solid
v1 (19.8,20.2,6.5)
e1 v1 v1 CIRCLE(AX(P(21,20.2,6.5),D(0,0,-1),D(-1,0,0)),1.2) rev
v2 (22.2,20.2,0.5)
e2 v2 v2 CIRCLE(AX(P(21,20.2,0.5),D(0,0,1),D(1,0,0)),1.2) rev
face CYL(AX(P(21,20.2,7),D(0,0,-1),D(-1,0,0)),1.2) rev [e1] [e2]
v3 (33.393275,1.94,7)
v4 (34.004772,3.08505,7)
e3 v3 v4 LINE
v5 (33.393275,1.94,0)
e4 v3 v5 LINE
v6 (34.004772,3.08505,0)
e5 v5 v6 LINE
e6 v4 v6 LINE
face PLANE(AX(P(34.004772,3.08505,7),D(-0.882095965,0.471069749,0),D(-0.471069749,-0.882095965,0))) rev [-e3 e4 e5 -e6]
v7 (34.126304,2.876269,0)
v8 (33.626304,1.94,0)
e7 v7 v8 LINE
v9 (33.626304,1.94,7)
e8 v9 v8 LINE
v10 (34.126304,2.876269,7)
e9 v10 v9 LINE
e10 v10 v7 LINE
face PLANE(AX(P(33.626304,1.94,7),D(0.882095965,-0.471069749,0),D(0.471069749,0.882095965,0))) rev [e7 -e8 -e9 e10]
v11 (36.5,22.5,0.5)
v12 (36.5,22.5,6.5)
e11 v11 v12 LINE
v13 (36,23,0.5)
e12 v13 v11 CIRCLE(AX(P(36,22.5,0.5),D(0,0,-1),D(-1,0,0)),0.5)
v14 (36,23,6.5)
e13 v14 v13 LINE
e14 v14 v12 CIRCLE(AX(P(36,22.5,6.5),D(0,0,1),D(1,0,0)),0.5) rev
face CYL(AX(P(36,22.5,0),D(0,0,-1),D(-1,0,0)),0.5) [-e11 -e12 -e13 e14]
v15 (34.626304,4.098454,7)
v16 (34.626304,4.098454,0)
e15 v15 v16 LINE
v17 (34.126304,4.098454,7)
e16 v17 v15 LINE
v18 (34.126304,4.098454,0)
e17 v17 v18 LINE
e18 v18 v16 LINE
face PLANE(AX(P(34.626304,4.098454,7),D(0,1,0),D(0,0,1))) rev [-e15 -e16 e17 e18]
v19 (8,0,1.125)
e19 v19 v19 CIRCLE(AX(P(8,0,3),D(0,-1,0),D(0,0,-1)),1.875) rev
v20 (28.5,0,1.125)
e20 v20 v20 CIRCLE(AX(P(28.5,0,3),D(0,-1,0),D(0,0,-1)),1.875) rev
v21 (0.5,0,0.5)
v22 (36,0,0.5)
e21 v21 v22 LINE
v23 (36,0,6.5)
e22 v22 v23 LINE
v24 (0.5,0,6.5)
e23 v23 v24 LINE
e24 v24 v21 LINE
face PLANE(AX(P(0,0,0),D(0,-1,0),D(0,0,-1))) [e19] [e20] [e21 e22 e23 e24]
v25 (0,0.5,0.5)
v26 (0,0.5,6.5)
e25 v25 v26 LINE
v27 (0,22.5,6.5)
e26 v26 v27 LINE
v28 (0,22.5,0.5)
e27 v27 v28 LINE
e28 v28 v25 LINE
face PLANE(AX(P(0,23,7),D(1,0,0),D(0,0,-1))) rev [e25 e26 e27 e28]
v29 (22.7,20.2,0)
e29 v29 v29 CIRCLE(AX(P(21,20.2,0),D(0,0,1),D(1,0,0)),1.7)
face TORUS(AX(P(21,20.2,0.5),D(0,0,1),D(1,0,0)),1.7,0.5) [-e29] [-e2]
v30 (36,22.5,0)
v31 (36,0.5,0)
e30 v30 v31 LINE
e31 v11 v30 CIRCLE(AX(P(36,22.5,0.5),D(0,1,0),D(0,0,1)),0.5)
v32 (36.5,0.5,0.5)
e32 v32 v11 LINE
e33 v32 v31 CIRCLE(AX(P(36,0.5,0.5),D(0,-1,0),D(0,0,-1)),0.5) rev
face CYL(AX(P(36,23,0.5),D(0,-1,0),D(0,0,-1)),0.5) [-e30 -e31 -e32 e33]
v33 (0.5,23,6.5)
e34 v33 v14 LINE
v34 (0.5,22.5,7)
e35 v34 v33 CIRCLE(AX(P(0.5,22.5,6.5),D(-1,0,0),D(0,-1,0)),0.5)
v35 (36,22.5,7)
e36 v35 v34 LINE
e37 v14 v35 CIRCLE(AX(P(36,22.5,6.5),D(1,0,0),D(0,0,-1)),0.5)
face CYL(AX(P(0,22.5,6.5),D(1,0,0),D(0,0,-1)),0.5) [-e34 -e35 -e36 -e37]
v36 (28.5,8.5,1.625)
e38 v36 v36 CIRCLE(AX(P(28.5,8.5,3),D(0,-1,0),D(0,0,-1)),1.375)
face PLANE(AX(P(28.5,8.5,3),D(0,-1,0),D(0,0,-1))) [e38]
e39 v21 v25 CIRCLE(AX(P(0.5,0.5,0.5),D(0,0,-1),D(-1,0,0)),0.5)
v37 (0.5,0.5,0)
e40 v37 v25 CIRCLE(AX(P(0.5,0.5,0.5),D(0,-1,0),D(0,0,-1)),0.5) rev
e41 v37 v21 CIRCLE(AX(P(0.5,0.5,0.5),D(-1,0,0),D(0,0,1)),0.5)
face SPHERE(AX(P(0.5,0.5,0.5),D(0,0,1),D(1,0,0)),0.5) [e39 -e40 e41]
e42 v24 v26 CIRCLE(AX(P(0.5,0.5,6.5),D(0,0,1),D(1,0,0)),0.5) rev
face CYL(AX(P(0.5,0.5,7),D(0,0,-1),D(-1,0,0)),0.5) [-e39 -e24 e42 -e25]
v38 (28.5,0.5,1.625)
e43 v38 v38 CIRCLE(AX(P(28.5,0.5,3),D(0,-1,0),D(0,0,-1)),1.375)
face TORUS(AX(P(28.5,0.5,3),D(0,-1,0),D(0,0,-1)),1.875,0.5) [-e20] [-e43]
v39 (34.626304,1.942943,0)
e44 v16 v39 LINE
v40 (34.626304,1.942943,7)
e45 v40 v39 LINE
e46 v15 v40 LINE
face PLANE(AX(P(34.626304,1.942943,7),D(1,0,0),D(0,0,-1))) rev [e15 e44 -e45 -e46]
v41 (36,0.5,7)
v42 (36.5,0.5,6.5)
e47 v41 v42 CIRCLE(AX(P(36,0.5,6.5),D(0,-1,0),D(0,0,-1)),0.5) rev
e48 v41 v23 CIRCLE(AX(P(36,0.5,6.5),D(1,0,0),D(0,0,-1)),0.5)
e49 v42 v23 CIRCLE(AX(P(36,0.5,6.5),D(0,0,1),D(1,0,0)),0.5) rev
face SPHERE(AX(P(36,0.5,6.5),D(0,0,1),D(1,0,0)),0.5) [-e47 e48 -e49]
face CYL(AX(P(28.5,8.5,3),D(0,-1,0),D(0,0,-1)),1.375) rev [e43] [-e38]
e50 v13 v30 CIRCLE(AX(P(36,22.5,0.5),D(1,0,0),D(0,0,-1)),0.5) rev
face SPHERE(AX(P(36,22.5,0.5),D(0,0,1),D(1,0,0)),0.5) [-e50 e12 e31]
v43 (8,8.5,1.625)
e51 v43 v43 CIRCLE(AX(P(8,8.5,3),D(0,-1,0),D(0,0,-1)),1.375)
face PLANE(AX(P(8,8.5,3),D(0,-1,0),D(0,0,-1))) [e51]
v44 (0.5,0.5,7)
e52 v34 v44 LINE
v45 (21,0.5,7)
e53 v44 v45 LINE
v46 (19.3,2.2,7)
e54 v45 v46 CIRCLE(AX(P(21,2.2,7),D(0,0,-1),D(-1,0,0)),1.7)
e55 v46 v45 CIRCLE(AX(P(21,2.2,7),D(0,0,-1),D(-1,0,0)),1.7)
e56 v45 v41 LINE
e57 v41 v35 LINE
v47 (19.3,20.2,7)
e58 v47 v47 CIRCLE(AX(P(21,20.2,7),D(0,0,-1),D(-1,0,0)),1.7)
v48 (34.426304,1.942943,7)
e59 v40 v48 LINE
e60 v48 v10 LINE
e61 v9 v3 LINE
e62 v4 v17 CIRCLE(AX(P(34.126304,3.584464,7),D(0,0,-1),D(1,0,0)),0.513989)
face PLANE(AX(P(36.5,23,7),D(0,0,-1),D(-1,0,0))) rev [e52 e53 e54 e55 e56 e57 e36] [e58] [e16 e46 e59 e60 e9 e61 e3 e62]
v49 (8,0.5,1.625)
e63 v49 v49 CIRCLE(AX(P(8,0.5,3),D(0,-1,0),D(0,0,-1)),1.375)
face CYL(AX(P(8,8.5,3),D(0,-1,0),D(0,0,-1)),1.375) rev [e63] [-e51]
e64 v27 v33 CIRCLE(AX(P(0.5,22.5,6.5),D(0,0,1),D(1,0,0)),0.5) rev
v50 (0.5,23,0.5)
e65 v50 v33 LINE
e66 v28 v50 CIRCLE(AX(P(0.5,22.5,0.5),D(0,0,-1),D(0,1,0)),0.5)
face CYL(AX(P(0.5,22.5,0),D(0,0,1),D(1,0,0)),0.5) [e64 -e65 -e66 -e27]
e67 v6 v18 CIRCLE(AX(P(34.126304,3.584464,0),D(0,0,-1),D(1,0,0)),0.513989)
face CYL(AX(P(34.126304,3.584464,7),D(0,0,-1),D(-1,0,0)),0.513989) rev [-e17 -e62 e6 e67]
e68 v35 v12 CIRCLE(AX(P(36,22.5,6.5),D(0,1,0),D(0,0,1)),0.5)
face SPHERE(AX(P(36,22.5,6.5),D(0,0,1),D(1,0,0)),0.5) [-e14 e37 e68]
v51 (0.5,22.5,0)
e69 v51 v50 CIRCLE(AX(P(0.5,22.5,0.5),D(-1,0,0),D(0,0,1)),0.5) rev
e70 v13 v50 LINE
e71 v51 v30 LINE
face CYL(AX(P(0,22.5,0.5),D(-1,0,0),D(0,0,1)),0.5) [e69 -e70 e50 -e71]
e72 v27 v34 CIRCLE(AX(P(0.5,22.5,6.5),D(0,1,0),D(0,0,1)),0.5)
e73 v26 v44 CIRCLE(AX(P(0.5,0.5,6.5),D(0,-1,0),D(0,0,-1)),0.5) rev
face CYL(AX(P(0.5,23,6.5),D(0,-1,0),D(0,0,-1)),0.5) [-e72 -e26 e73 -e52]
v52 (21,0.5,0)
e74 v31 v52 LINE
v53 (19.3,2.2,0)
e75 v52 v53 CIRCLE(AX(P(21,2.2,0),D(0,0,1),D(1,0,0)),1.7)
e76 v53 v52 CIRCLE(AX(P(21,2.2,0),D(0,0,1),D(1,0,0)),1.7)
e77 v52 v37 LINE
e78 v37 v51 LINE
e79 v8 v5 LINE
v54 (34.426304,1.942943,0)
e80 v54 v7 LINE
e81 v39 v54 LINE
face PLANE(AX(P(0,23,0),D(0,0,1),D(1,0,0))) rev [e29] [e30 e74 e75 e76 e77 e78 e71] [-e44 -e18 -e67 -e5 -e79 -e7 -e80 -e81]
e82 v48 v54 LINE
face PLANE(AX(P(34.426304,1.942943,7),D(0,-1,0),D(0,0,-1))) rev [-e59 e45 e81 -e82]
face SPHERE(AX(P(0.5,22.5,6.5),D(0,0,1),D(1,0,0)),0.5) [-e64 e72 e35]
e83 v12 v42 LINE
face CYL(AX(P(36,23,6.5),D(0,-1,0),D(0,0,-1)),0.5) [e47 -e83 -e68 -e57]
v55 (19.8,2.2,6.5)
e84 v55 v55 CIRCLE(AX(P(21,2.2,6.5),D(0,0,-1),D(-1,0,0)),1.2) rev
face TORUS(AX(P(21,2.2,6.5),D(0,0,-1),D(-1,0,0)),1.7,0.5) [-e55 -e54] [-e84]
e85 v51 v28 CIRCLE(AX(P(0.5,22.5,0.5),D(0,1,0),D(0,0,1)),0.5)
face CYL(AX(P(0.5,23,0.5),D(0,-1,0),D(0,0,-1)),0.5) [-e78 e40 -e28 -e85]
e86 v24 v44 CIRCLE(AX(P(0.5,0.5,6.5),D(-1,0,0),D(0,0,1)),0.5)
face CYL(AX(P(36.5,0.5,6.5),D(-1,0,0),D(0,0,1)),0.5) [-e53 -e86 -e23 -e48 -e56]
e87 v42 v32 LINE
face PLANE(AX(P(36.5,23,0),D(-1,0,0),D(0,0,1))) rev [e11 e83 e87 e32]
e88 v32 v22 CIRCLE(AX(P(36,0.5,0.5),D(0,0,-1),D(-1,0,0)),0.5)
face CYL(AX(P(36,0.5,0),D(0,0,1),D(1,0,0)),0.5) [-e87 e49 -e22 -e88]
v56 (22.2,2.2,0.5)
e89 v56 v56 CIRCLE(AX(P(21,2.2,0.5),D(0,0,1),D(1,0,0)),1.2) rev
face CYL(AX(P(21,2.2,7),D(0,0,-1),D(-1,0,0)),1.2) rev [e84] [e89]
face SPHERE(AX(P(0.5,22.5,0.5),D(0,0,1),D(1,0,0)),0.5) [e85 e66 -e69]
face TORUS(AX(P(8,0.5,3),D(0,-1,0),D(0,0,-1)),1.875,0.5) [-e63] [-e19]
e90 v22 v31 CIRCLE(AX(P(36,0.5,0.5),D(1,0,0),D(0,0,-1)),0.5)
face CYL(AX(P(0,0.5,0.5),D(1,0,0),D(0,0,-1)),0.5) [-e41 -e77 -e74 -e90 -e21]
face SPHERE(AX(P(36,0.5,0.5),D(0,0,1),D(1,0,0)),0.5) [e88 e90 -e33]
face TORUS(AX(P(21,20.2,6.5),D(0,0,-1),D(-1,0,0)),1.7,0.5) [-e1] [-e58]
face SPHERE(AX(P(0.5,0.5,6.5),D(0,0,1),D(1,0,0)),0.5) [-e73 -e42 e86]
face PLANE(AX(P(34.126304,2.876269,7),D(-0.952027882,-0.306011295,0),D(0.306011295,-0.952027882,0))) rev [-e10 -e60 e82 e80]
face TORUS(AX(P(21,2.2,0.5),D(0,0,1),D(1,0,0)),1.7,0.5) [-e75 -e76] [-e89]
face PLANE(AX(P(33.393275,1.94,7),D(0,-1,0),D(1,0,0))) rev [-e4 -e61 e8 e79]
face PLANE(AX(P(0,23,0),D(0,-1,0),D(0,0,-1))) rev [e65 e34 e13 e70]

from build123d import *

# Parameters (mm, degrees)
SKETCH1_W           = 36.5
SKETCH1_H           = 7
BOSS_EXTRUDE1_DEPTH = 23
SKETCH2_R           = 1.375
CUT_EXTRUDE1_DEPTH  = 8.5
SKETCH4_R           = 1.2
CUT_EXTRUDE2_DEPTH  = 7
FILLET1_R           = 0.5
CUT_EXTRUDE3_DEPTH  = 44.706406853


with BuildPart() as part:
    # Sketch1 → Boss-Extrude1 (new body)
    with BuildSketch(Plane(origin=(0, 0, 0), x_dir=(1, 0, 0), z_dir=(0, 1, 0))):
        with Locations((18.25, -3.5)):
            Rectangle(SKETCH1_W, SKETCH1_H)
    extrude(amount=BOSS_EXTRUDE1_DEPTH)

    # Sketch2 → Cut-Extrude1 (cut)
    with BuildSketch(Plane.XZ):
        with Locations(Location((8, 3, 0), (0, 0, 270))):
            Circle(SKETCH2_R)
        with Locations(Location((28.5, 3, 0), (0, 0, 270))):
            Circle(SKETCH2_R)
    extrude(amount=-CUT_EXTRUDE1_DEPTH, mode=Mode.SUBTRACT)

    # Sketch4 → Cut-Extrude2 (cut)
    with BuildSketch(Plane(origin=(0, 0, 0), x_dir=(-1, 0, 0), z_dir=(0, 0, -1))):
        with Locations((-21, 2.2)):
            Circle(SKETCH4_R)
        with Locations((-21, 20.2)):
            Circle(SKETCH4_R)
    extrude(amount=-CUT_EXTRUDE2_DEPTH, mode=Mode.SUBTRACT)

    # Fillet1
    fillet1_edges = [part.edges().sort_by_distance(p)[0] for p in [
        (36.5, 23, 3.5),
        (8, 0, 4.375),
        (18.25, 23, 0),
        (28.5, 0, 4.375),
        (22.2, 2.2, 7),
        (22.2, 2.2, 0),
        (22.2, 20.2, 7),
        (22.2, 20.2, 0),
        (0, 23, 3.5),
        (18.25, 0, 0),
        (36.5, 0, 3.5),
        (18.25, 0, 7),
        (0, 0, 3.5),
        (0, 11.5, 0),
        (36.5, 11.5, 0),
        (36.5, 11.5, 7),
        (0, 11.5, 7),
        (18.25, 23, 7),
    ]]
    fillet(fillet1_edges, radius=FILLET1_R - 0.0001)  # a hair under: the kernel refuses the full size

    # Sketch6 → Cut-Extrude3 (cut, through all)
    with BuildSketch(Plane(origin=(0, 0, 0), x_dir=(-1, 0, 0), z_dir=(0, 0, -1))):
        with BuildLine():
            Line((-34.626303685, 1.94294274), (-34.626303685, 4.098453698))
            Line((-34.626303685, 4.098453698), (-34.126303685, 4.098453698))
            ThreePointArc((-34.126303685, 4.098453698), (-33.615970927, 3.645665749), (-34.004771514, 3.085049521))
            Line((-34.004771514, 3.085049521), (-33.393275473, 1.94))
            Line((-33.393275473, 1.94), (-33.626303685, 1.94))
            Line((-33.626303685, 1.94), (-34.126303685, 2.876268958))
            Line((-34.126303685, 2.876268958), (-34.426303685, 1.94294274))
            Line((-34.426303685, 1.94294274), (-34.626303685, 1.94294274))
        make_face()
    extrude(amount=-CUT_EXTRUDE3_DEPTH, mode=Mode.SUBTRACT)


solid = part.part
